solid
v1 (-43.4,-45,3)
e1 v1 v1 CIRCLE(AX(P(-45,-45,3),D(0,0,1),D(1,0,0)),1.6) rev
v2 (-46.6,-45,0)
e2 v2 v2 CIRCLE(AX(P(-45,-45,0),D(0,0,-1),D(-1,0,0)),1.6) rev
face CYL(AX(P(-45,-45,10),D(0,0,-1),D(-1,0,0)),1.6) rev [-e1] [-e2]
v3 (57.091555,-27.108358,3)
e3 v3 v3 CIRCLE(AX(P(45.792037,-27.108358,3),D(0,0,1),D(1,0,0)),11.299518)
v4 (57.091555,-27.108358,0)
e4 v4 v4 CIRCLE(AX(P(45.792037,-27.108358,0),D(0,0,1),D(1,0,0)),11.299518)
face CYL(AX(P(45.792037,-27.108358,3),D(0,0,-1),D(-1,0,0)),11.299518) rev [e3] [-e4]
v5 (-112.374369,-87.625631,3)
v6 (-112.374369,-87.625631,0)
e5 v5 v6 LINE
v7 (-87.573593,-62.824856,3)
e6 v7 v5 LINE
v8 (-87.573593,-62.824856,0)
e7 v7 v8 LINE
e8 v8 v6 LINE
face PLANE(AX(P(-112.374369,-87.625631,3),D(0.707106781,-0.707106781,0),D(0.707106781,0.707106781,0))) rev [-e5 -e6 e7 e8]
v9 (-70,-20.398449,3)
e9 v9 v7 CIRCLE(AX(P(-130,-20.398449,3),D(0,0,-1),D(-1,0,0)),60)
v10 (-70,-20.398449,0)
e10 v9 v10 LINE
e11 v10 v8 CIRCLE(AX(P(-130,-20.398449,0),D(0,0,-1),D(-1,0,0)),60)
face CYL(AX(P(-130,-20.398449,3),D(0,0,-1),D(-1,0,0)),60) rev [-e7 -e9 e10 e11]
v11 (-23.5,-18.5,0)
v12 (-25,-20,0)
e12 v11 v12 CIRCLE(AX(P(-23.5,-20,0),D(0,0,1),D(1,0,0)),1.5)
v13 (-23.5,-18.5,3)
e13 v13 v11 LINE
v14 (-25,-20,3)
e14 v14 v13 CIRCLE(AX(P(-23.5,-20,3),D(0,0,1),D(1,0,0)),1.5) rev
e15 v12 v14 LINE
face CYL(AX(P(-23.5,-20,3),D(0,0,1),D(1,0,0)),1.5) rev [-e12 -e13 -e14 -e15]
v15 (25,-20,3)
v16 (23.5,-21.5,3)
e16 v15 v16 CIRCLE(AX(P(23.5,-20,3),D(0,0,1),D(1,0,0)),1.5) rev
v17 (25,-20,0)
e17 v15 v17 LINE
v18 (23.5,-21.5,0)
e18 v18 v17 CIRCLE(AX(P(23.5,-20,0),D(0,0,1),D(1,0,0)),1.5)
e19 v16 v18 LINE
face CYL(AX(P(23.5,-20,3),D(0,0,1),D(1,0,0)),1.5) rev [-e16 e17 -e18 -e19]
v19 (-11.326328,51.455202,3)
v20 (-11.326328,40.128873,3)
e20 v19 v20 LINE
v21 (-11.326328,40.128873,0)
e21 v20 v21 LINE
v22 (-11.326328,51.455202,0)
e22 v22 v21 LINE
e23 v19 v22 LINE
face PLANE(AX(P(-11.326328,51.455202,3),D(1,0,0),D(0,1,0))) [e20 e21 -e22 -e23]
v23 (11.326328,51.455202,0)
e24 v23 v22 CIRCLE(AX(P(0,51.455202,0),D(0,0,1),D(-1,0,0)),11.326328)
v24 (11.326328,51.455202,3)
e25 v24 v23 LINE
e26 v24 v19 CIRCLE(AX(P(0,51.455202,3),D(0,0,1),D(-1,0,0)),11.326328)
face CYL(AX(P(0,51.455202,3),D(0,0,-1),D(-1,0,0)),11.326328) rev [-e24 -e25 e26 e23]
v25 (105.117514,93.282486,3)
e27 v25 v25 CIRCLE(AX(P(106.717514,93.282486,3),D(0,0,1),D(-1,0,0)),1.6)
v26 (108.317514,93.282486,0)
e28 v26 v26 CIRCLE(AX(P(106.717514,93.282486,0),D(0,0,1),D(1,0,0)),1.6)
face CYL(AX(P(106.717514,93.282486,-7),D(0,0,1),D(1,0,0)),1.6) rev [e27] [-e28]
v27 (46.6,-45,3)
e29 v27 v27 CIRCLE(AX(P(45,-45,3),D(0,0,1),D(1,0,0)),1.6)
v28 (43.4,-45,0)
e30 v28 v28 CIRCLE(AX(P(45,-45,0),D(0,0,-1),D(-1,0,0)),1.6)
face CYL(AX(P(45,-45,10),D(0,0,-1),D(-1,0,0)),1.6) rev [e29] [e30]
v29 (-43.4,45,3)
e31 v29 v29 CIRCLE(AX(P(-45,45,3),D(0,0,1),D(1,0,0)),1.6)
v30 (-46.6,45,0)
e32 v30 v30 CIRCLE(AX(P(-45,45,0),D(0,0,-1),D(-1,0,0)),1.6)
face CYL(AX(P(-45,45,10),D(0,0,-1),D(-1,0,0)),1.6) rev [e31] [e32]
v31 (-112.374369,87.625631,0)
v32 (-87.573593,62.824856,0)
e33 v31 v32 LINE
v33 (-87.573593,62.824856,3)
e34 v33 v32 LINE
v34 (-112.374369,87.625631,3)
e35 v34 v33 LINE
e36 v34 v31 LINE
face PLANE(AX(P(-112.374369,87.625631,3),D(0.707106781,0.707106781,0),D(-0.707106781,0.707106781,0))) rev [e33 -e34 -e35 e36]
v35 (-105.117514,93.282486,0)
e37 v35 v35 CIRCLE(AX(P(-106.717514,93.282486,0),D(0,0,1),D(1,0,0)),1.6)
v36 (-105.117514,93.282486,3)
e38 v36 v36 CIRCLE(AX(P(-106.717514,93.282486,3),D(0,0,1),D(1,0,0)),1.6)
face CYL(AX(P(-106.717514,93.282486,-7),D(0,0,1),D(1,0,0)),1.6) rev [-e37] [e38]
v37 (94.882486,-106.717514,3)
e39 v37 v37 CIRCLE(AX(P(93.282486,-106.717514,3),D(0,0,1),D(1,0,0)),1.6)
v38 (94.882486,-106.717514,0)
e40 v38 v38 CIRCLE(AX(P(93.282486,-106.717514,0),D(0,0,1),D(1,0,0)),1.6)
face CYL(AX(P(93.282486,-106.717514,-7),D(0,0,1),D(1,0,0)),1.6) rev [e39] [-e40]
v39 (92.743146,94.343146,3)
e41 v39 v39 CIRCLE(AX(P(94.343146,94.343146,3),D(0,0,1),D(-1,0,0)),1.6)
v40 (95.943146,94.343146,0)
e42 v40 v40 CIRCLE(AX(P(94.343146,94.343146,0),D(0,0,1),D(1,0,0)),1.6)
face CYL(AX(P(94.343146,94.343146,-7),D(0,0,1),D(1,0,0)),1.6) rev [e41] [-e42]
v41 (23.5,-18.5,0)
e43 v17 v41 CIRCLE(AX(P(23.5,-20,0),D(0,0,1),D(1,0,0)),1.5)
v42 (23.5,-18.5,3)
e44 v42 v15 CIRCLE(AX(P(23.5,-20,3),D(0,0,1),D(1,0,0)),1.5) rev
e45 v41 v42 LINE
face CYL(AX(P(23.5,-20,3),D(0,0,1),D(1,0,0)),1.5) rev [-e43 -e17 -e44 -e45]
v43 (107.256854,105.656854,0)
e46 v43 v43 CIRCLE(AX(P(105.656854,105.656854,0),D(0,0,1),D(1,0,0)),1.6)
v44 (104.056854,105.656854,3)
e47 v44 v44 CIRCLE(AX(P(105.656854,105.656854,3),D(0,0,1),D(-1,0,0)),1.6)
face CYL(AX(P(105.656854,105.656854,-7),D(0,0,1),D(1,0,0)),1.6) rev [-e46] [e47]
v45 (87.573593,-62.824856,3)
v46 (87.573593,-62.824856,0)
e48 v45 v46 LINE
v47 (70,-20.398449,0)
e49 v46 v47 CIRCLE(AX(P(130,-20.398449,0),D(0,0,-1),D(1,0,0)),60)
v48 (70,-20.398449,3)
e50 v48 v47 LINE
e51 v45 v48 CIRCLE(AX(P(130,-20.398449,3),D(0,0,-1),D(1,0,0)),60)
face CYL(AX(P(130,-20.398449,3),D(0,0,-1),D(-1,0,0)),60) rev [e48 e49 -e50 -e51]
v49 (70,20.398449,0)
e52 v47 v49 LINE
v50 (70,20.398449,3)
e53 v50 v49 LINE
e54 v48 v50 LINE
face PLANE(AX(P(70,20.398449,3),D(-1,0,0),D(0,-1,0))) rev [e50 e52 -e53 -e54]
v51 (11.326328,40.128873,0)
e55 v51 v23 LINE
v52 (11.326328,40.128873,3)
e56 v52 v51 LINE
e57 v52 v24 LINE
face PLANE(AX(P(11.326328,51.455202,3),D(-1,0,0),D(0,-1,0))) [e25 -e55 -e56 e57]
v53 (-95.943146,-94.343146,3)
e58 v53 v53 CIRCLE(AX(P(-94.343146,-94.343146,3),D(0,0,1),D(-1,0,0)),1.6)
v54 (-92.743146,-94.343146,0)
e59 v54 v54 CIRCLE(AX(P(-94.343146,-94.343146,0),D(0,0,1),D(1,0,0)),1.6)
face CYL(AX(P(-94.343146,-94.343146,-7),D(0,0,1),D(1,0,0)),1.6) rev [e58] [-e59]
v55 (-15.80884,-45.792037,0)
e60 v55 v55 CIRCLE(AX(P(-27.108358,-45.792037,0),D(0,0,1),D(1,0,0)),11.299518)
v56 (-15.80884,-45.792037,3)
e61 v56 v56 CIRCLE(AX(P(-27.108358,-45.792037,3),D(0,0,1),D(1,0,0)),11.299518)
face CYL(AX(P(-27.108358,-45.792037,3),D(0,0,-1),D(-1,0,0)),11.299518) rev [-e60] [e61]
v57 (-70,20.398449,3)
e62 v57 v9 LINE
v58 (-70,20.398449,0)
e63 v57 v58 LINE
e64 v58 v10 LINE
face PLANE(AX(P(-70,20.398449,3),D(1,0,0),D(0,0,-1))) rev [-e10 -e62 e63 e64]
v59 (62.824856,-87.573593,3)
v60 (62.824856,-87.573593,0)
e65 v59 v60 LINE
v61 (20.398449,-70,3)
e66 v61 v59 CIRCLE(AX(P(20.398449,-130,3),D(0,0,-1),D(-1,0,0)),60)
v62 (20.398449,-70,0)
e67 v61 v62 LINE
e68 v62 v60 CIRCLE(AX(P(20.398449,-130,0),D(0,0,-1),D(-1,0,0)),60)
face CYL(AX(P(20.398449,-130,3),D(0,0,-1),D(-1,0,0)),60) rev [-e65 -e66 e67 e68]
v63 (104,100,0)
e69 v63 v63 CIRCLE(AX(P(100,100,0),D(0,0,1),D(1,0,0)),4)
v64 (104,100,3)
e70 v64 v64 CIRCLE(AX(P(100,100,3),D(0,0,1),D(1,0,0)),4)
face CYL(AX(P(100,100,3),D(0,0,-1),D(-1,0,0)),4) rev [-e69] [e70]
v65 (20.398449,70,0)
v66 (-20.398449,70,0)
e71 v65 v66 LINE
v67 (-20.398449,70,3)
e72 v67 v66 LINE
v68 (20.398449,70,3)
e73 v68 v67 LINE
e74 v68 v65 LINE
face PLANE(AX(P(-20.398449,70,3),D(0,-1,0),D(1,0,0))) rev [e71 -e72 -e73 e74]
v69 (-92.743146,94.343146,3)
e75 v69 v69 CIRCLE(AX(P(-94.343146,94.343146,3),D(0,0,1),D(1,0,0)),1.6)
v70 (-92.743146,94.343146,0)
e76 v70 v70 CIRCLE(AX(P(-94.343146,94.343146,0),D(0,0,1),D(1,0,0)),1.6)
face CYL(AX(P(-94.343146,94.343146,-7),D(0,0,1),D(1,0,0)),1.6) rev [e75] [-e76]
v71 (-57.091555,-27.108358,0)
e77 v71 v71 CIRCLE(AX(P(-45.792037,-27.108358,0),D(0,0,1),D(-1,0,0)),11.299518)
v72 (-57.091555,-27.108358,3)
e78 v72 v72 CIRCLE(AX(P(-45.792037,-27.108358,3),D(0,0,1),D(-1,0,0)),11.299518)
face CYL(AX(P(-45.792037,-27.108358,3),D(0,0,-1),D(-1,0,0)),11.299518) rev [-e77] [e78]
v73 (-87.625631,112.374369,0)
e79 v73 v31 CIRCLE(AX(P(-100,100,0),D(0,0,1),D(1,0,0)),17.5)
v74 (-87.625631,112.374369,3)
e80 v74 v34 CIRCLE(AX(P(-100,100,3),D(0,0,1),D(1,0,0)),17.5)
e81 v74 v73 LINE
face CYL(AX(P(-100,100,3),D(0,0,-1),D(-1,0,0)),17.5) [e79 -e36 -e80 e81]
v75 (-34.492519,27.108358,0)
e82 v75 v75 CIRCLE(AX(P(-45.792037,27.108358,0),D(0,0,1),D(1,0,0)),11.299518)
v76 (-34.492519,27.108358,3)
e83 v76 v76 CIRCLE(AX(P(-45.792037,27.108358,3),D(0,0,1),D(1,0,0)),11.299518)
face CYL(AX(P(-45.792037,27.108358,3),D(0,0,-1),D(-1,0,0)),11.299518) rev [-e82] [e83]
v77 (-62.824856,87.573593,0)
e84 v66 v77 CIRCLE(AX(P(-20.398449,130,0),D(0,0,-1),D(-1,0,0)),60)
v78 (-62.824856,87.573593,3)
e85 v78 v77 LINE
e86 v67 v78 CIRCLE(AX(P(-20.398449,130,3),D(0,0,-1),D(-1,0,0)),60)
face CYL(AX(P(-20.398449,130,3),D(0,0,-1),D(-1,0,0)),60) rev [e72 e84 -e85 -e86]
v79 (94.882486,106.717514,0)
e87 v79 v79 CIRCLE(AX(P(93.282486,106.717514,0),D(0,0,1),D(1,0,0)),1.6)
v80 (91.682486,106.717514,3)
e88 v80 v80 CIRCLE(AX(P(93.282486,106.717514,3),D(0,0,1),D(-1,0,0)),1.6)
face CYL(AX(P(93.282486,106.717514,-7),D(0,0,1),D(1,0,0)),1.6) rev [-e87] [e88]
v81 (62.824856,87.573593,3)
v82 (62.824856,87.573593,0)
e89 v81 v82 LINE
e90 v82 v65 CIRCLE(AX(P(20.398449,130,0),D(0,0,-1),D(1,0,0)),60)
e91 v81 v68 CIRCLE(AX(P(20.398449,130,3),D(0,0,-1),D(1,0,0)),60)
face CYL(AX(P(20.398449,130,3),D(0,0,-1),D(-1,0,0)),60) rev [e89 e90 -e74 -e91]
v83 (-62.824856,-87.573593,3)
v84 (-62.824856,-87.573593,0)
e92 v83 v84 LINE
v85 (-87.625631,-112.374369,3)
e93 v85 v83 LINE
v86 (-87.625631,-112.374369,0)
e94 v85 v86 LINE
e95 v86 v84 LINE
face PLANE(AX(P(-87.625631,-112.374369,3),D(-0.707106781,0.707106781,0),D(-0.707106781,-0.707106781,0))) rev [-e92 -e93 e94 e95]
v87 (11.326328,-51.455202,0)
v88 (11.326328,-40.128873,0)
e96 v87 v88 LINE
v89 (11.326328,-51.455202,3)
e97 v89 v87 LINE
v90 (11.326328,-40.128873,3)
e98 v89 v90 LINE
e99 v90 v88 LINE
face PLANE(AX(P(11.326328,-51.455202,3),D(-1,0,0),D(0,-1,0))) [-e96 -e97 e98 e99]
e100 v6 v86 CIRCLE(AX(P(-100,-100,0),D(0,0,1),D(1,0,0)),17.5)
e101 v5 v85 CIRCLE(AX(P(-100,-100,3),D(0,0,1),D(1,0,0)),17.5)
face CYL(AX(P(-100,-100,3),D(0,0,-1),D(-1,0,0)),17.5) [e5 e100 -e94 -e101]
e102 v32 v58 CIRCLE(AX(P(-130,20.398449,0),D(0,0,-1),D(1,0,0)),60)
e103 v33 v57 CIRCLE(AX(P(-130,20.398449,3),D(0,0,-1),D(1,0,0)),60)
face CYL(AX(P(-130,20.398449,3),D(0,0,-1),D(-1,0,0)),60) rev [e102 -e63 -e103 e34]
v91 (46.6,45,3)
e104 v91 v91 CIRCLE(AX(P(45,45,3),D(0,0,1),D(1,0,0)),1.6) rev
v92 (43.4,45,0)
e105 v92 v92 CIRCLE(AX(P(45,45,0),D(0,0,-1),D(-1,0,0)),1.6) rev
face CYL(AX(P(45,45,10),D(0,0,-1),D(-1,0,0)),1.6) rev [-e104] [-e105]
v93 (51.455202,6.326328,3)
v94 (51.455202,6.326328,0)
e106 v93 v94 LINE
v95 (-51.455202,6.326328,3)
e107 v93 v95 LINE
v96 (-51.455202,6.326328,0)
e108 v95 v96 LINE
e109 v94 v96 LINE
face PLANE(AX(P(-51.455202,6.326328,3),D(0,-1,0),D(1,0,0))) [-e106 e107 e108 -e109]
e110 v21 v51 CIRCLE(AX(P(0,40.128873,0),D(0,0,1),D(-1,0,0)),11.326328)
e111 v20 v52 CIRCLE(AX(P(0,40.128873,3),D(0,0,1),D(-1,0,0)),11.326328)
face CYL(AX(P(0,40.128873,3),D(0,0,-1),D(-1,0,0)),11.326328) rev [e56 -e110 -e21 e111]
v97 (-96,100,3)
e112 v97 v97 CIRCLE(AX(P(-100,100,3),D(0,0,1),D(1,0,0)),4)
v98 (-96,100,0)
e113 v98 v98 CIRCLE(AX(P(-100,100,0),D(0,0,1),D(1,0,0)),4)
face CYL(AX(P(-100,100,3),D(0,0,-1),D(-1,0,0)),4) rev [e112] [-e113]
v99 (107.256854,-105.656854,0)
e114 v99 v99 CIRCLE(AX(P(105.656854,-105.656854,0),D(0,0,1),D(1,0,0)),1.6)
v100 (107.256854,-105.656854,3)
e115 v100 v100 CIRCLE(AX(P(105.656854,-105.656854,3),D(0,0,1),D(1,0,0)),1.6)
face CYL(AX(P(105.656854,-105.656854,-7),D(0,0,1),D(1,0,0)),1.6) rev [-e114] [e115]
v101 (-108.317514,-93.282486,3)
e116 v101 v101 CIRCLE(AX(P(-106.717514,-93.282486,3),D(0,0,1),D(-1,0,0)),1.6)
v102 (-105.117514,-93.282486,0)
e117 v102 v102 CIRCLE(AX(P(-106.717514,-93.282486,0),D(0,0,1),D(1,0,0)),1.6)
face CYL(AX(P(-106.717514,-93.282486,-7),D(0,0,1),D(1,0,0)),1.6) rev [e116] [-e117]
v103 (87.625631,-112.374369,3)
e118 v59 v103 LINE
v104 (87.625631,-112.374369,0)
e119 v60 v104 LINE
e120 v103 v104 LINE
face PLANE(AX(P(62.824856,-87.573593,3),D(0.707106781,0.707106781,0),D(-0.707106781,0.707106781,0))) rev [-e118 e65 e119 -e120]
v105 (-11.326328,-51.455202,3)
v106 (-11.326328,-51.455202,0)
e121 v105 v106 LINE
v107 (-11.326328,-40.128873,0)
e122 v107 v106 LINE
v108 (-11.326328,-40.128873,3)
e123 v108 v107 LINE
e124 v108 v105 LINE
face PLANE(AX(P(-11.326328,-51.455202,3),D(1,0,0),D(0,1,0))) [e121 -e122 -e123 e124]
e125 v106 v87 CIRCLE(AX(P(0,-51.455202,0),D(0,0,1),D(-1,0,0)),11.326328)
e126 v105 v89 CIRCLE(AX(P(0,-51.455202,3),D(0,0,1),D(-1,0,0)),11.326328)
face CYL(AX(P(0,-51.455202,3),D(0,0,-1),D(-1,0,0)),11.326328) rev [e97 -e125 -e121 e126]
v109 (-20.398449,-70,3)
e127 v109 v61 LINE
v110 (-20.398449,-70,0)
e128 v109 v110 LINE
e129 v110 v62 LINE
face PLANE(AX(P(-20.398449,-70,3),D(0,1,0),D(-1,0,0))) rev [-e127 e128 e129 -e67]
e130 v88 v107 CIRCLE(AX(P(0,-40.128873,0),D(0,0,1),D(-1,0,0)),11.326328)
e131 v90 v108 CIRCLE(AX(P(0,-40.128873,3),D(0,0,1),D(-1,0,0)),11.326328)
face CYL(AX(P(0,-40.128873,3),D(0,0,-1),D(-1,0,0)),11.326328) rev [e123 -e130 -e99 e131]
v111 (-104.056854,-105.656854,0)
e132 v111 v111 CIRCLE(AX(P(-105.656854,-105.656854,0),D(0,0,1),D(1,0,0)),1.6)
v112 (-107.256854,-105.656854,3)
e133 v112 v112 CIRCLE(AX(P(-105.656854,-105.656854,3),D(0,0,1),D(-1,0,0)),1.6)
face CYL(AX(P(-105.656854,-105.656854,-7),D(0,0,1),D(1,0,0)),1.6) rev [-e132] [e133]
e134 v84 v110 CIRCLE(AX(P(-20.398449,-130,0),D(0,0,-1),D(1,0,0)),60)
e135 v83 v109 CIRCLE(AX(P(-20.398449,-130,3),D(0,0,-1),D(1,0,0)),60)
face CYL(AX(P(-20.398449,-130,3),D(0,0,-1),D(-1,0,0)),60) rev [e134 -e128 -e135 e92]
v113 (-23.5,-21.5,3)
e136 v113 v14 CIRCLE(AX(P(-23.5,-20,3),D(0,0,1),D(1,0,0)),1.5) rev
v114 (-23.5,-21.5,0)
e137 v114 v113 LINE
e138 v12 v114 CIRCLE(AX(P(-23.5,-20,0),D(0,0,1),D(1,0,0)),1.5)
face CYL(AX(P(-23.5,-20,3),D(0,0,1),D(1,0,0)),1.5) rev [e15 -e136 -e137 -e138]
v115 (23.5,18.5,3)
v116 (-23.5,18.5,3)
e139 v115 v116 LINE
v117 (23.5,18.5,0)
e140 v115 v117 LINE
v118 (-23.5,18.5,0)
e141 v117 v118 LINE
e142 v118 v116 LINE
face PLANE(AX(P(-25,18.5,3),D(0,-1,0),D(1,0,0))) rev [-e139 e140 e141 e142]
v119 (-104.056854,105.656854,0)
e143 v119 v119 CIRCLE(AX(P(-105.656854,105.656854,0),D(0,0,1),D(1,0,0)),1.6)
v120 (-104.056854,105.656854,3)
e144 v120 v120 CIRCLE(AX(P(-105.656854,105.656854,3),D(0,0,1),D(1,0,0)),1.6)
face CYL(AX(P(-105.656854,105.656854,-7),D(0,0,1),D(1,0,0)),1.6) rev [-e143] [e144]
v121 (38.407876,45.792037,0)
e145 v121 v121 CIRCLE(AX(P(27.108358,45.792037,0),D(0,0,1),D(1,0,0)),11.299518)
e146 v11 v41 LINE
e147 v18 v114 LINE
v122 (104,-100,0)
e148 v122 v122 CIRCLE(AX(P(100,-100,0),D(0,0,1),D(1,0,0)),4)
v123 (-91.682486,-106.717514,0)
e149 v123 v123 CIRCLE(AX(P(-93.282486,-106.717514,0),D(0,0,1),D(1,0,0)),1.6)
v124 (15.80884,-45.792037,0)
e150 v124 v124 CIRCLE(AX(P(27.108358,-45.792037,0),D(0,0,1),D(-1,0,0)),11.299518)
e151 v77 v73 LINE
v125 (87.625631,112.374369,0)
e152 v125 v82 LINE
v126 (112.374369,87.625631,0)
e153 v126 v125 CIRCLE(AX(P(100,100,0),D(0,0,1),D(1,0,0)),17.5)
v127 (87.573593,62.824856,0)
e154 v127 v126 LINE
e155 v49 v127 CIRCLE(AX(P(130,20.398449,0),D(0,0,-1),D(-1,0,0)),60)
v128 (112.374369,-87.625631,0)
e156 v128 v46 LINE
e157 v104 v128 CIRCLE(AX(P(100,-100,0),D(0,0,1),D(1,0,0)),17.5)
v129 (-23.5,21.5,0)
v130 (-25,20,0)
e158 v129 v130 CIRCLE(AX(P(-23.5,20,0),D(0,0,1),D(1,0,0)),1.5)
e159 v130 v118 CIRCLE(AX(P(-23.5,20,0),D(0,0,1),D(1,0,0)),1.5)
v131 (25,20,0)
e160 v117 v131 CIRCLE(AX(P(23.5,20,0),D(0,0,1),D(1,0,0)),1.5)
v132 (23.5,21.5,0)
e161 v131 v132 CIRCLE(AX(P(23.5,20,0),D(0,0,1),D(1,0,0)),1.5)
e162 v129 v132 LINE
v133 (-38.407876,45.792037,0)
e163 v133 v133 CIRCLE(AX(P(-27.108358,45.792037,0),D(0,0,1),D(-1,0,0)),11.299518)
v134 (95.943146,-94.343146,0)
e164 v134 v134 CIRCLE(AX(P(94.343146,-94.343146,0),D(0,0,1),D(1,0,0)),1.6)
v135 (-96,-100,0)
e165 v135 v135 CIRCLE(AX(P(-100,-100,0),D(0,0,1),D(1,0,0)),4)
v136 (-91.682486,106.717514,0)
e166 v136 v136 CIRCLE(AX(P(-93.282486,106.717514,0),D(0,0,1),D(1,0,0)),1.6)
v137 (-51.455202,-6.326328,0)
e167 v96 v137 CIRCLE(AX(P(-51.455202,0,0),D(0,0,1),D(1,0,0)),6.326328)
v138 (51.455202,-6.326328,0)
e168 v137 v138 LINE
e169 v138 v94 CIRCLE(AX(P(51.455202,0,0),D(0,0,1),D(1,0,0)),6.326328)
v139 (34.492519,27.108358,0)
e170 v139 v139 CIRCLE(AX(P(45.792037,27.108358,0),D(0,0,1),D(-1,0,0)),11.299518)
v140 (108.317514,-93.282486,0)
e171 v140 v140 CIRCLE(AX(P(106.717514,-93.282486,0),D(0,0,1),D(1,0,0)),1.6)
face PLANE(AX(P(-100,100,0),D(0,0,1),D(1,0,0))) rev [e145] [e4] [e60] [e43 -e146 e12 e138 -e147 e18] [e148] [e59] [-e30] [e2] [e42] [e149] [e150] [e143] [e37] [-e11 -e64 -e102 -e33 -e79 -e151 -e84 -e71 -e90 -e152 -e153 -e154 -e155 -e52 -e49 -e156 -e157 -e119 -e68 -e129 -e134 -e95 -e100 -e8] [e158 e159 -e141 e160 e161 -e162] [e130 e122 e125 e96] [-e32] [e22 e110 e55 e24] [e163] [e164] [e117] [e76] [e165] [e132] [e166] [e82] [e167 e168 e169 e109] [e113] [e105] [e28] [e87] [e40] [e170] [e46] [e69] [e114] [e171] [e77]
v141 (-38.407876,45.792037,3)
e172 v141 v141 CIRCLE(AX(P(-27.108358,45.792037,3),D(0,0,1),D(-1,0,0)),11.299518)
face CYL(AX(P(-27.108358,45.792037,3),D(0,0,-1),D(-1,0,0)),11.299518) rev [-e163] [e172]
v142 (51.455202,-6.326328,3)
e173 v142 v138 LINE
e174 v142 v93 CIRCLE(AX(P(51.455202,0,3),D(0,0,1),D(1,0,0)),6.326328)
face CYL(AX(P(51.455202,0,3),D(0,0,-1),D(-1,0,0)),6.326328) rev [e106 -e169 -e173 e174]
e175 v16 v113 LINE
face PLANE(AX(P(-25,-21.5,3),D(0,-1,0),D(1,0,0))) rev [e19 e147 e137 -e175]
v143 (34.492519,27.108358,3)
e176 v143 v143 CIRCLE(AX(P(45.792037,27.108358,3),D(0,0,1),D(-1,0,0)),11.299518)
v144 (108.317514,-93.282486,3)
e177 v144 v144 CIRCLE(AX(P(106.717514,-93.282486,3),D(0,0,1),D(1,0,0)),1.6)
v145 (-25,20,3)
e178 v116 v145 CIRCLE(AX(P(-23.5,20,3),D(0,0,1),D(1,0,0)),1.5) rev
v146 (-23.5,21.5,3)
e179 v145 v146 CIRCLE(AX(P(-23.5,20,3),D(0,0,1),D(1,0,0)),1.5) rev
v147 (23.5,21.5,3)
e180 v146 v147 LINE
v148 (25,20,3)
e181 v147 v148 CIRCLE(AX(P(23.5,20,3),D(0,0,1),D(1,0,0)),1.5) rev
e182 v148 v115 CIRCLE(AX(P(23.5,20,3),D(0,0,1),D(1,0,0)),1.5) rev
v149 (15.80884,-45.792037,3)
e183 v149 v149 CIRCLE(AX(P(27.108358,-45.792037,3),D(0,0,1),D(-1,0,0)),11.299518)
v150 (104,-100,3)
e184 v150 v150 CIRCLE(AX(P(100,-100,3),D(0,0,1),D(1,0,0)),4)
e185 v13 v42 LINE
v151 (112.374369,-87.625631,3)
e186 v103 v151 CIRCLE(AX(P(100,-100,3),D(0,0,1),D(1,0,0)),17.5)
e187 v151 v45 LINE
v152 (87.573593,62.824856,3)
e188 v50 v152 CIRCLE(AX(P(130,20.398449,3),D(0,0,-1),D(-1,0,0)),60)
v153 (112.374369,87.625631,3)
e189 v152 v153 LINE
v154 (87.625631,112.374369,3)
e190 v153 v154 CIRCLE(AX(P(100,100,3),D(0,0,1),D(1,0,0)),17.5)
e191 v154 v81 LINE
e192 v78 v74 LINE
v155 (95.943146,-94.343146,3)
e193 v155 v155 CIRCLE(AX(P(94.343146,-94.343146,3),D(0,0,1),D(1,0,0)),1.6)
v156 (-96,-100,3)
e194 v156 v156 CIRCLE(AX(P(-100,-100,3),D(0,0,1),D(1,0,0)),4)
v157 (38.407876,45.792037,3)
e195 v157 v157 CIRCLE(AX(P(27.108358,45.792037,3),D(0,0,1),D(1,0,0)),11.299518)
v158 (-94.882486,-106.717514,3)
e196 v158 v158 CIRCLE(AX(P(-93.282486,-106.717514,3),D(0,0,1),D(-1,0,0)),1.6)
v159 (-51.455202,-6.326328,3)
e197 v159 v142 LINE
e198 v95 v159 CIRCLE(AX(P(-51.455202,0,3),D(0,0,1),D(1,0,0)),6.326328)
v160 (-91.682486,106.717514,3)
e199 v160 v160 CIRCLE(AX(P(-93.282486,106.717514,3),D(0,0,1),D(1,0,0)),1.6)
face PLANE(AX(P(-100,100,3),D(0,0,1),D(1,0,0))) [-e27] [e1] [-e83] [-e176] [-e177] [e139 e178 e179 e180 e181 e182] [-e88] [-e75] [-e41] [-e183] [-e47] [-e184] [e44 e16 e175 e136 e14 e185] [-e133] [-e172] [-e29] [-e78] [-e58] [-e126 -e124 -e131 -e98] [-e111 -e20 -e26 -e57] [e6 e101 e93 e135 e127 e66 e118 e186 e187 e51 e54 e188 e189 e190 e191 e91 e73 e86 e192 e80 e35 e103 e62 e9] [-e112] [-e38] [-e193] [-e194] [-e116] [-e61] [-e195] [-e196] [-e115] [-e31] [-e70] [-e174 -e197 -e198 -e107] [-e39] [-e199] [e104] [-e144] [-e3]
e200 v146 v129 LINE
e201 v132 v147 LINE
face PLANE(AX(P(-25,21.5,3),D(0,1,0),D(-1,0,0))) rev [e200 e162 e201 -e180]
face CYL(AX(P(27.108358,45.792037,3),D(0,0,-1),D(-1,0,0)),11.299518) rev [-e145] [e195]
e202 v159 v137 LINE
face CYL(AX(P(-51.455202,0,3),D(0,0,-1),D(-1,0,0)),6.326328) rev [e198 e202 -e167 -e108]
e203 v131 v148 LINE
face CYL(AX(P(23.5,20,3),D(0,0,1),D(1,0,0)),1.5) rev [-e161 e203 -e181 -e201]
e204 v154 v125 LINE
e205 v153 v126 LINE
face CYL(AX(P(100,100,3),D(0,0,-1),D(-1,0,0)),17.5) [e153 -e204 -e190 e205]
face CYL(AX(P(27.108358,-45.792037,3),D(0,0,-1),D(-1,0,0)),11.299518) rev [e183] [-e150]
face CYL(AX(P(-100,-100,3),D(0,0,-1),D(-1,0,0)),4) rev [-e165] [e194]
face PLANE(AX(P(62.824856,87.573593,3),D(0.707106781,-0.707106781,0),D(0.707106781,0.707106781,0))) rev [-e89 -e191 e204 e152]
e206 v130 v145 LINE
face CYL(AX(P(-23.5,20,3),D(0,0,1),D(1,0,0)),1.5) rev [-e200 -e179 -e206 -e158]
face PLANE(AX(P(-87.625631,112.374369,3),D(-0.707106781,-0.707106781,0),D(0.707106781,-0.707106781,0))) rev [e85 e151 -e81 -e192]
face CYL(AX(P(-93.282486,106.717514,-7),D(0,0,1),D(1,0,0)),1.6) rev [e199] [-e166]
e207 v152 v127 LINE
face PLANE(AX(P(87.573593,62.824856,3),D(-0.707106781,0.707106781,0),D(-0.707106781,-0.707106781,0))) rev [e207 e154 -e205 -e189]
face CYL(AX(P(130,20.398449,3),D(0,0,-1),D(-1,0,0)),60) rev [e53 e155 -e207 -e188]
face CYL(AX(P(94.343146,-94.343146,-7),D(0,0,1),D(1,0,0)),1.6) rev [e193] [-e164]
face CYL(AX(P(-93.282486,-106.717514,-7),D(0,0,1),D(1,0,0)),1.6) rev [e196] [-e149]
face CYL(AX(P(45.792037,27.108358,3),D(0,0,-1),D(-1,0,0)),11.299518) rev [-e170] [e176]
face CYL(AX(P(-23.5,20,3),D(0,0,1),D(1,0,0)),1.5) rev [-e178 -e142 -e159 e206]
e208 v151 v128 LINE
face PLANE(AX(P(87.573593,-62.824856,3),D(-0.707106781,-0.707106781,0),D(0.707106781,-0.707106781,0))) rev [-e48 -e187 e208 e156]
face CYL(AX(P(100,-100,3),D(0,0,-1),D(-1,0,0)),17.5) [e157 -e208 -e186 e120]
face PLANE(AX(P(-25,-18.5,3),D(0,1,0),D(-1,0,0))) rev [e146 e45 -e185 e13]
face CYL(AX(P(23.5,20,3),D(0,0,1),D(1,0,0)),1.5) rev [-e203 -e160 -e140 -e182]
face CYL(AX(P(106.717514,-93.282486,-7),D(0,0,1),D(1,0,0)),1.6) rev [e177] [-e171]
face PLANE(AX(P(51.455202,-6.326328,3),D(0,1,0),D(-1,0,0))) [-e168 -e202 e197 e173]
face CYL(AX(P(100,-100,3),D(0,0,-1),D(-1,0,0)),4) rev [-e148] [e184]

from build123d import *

# Parameters (mm, degrees)
SKETCH1_R           = 4
SKETCH1_R_2         = 3.999999999
SKETCH1_R_3         = 4.000000001
SKETCH1_R_4         = 4.000000002
SKETCH1_R_5         = 11.299517889
BOSS_EXTRUDE2_DEPTH = 3
SKETCH2_R           = 1.600000003
SKETCH2_R_2         = 1.599999997
CUT_EXTRUDE1_DEPTH  = 10
SKETCH3_R           = 1.6
CUT_EXTRUDE2_DEPTH  = 10
SKETCH4_W           = 50
SKETCH4_H           = 3
CUT_EXTRUDE3_DEPTH  = 167.197172059
FILLET1_R           = 1.5
FILLET2_R           = 1.5


with BuildPart() as part:
    # Sketch1 → Boss-Extrude2 (new body)
    with BuildSketch(Plane.XY):
        with BuildLine():
            Line((-112.374368671, 87.62563133), (-87.573593128, 62.824855788))
            ThreePointArc((-87.573593128, 62.824855788), (-74.567228049, 43.359454858), (-70, 20.398448917))
            Line((-70, 20.398448917), (-70, -20.398448916))
            ThreePointArc((-70, -20.398448916), (-74.567228049, -43.359454858), (-87.573593128, -62.824855787))
            Line((-87.573593128, -62.824855787), (-112.374368671, -87.625631329))
            ThreePointArc((-112.374368671, -87.625631329), (-112.374368671, -112.374368671), (-87.625631329, -112.374368671))
            Line((-87.625631329, -112.374368671), (-62.824855787, -87.573593129))
            ThreePointArc((-62.824855787, -87.573593129), (-43.359454858, -74.567228049), (-20.398448916, -70))
            Line((-20.398448916, -70), (20.398448917, -70))
            ThreePointArc((20.398448917, -70), (43.359454859, -74.567228049), (62.824855788, -87.573593129))
            Line((62.824855788, -87.573593129), (87.62563133, -112.374368671))
            ThreePointArc((87.62563133, -112.374368671), (112.374368671, -112.374368671), (112.374368671, -87.625631329))
            Line((112.374368671, -87.625631329), (87.573593129, -62.824855787))
            ThreePointArc((87.573593129, -62.824855787), (74.567228049, -43.359454858), (70, -20.398448916))
            Line((70, -20.398448916), (70, 20.398448916))
            ThreePointArc((70, 20.398448916), (74.567228049, 43.359454858), (87.573593129, 62.824855788))
            Line((87.573593129, 62.824855788), (112.374368671, 87.62563133))
            ThreePointArc((112.374368671, 87.62563133), (112.374368671, 112.374368671), (87.62563133, 112.374368671))
            Line((87.62563133, 112.374368671), (62.824855788, 87.573593129))
            ThreePointArc((62.824855788, 87.573593129), (43.359454858, 74.56722805), (20.398448916, 70))
            Line((20.398448916, 70), (-20.398448916, 70))
            ThreePointArc((-20.398448916, 70), (-43.359454858, 74.56722805), (-62.824855787, 87.573593129))
            Line((-62.824855787, 87.573593129), (-87.625631329, 112.374368671))
            ThreePointArc((-87.625631329, 112.374368671), (-112.374368671, 112.374368671), (-112.374368671, 87.62563133))
        make_face()
        with Locations((-100.000000001, 100.000000001)):
            Circle(SKETCH1_R, mode=Mode.SUBTRACT)
        with Locations((100.000000001, 100.000000001)):
            Circle(SKETCH1_R_2, mode=Mode.SUBTRACT)
        with Locations((100.000000001, -100.000000004)):
            Circle(SKETCH1_R_3, mode=Mode.SUBTRACT)
        with Locations((-100.000000001, -100.000000004)):
            Circle(SKETCH1_R_4, mode=Mode.SUBTRACT)
        with Locations((-27.108358193, -45.792037353)):
            Circle(SKETCH1_R_5, mode=Mode.SUBTRACT)
        with Locations(Location((27.108358193, -45.792037353, 0), (0, 0, 180))):
            Circle(SKETCH1_R_5, mode=Mode.SUBTRACT)
        with Locations((27.108358193, 45.792037353)):
            Circle(SKETCH1_R_5, mode=Mode.SUBTRACT)
        with Locations(Location((-27.108358193, 45.792037353, 0), (0, 0, 180))):
            Circle(SKETCH1_R_5, mode=Mode.SUBTRACT)
        with Locations(Location((-45.792037353, -27.108358193, 0), (0, 0, 180))):
            Circle(SKETCH1_R_5, mode=Mode.SUBTRACT)
        with Locations((-45.792037353, 27.108358193)):
            Circle(SKETCH1_R_5, mode=Mode.SUBTRACT)
        with Locations((45.792037353, -27.108358193)):
            Circle(SKETCH1_R_5, mode=Mode.SUBTRACT)
        with Locations(Location((45.792037353, 27.108358193, 0), (0, 0, 180))):
            Circle(SKETCH1_R_5, mode=Mode.SUBTRACT)
        with BuildLine():
            Line((11.326328369, 51.455201537), (11.326328369, 40.128873169))
            ThreePointArc((11.326328369, 40.128873169), (0, 28.8025448), (-11.326328369, 40.128873169))
            Line((-11.326328369, 40.128873169), (-11.326328369, 51.455201537))
            ThreePointArc((-11.326328369, 51.455201537), (0, 62.781529906), (11.326328369, 51.455201537))
        make_face(mode=Mode.SUBTRACT)
        with BuildLine():
            Line((11.326328369, -51.455201537), (11.326328369, -40.128873169))
            ThreePointArc((11.326328369, -40.128873169), (0, -28.8025448), (-11.326328369, -40.128873169))
            Line((-11.326328369, -40.128873169), (-11.326328369, -51.455201537))
            ThreePointArc((-11.326328369, -51.455201537), (0, -62.781529906), (11.326328369, -51.455201537))
        make_face(mode=Mode.SUBTRACT)
        with BuildLine():
            Line((51.455201537, 6.326328369), (40.128873169, 6.326328369))
            Line((40.128873169, 6.326328369), (-40.128873169, 6.326328369))
            Line((-40.128873169, 6.326328369), (-51.455201537, 6.326328369))
            ThreePointArc((-51.455201537, 6.326328369), (-57.781529906, 0), (-51.455201537, -6.326328369))
            Line((-51.455201537, -6.326328369), (-40.128873169, -6.326328369))
            Line((-40.128873169, -6.326328369), (40.128873169, -6.326328369))
            Line((40.128873169, -6.326328369), (51.455201537, -6.326328369))
            ThreePointArc((51.455201537, -6.326328369), (57.781529906, 0), (51.455201537, 6.326328369))
        make_face(mode=Mode.SUBTRACT)
    extrude(amount=BOSS_EXTRUDE2_DEPTH)

    # Sketch2 → Cut-Extrude1 (cut)
    with BuildSketch(Plane.XY.offset(3)):
        with Locations((106.717514422, 93.282485579)):
            Circle(SKETCH2_R)
        with Locations((105.65685425, 105.65685425)):
            Circle(SKETCH2_R)
        with Locations((93.282485579, 106.717514422)):
            Circle(SKETCH2_R)
        with Locations((94.343145751, 94.343145751)):
            Circle(SKETCH2_R)
        with Locations((-94.343145751, 94.343145751)):
            Circle(SKETCH2_R_2)
        with Locations((-93.282485579, 106.717514422)):
            Circle(SKETCH2_R_2)
        with Locations((-105.65685425, 105.65685425)):
            Circle(SKETCH2_R_2)
        with Locations((-106.717514422, 93.282485579)):
            Circle(SKETCH2_R_2)
        with Locations((-106.717514422, -93.282485579)):
            Circle(SKETCH2_R_2)
        with Locations((-105.65685425, -105.65685425)):
            Circle(SKETCH2_R_2)
        with Locations((-93.282485579, -106.717514422)):
            Circle(SKETCH2_R_2)
        with Locations((-94.343145751, -94.343145751)):
            Circle(SKETCH2_R_2)
        with Locations((94.343145751, -94.343145751)):
            Circle(SKETCH2_R)
        with Locations((93.282485579, -106.717514422)):
            Circle(SKETCH2_R)
        with Locations((105.65685425, -105.65685425)):
            Circle(SKETCH2_R)
        with Locations((106.717514422, -93.282485579)):
            Circle(SKETCH2_R)
    extrude(amount=-CUT_EXTRUDE1_DEPTH, mode=Mode.SUBTRACT)

    # Sketch3 → Cut-Extrude2 (cut)
    with BuildSketch(Plane(origin=(0, 0, 0), x_dir=(-1, 0, 0), z_dir=(0, 0, -1))):
        with Locations((-45, -45)):
            Circle(SKETCH3_R)
        with Locations((-45, 45)):
            Circle(SKETCH3_R)
        with Locations((45, 45)):
            Circle(SKETCH3_R)
        with Locations((45, -45)):
            Circle(SKETCH3_R)
    extrude(amount=-CUT_EXTRUDE2_DEPTH, mode=Mode.SUBTRACT)

    # Sketch4 → Cut-Extrude3 (cut, through all)
    with BuildSketch(Plane(origin=(0, 0, 0), x_dir=(-1, 0, 0), z_dir=(0, 0, -1))):
        with Locations((0, -20)):
            Rectangle(SKETCH4_W, SKETCH4_H)
        with Locations((0, 20)):
            Rectangle(SKETCH4_W, SKETCH4_H)
    extrude(amount=-CUT_EXTRUDE3_DEPTH, mode=Mode.SUBTRACT)

    # Fillet1
    fillet1_edges = [part.edges().sort_by_distance(p)[0] for p in [
        (25, 21.5, 1.5),
        (25, 18.5, 1.5),
        (-25, 18.5, 1.5),
        (-25, 21.5, 1.5),
    ]]
    fillet(fillet1_edges, radius=FILLET1_R - 0.0001)  # a hair under: the kernel refuses the full size

    # Fillet2
    fillet2_edges = [part.edges().sort_by_distance(p)[0] for p in [
        (-25, -21.5, 1.5),
        (-25, -18.5, 1.5),
        (25, -21.5, 1.5),
        (25, -18.5, 1.5),
    ]]
    fillet(fillet2_edges, radius=FILLET2_R - 0.0001)  # a hair under: the kernel refuses the full size


solid = part.part
